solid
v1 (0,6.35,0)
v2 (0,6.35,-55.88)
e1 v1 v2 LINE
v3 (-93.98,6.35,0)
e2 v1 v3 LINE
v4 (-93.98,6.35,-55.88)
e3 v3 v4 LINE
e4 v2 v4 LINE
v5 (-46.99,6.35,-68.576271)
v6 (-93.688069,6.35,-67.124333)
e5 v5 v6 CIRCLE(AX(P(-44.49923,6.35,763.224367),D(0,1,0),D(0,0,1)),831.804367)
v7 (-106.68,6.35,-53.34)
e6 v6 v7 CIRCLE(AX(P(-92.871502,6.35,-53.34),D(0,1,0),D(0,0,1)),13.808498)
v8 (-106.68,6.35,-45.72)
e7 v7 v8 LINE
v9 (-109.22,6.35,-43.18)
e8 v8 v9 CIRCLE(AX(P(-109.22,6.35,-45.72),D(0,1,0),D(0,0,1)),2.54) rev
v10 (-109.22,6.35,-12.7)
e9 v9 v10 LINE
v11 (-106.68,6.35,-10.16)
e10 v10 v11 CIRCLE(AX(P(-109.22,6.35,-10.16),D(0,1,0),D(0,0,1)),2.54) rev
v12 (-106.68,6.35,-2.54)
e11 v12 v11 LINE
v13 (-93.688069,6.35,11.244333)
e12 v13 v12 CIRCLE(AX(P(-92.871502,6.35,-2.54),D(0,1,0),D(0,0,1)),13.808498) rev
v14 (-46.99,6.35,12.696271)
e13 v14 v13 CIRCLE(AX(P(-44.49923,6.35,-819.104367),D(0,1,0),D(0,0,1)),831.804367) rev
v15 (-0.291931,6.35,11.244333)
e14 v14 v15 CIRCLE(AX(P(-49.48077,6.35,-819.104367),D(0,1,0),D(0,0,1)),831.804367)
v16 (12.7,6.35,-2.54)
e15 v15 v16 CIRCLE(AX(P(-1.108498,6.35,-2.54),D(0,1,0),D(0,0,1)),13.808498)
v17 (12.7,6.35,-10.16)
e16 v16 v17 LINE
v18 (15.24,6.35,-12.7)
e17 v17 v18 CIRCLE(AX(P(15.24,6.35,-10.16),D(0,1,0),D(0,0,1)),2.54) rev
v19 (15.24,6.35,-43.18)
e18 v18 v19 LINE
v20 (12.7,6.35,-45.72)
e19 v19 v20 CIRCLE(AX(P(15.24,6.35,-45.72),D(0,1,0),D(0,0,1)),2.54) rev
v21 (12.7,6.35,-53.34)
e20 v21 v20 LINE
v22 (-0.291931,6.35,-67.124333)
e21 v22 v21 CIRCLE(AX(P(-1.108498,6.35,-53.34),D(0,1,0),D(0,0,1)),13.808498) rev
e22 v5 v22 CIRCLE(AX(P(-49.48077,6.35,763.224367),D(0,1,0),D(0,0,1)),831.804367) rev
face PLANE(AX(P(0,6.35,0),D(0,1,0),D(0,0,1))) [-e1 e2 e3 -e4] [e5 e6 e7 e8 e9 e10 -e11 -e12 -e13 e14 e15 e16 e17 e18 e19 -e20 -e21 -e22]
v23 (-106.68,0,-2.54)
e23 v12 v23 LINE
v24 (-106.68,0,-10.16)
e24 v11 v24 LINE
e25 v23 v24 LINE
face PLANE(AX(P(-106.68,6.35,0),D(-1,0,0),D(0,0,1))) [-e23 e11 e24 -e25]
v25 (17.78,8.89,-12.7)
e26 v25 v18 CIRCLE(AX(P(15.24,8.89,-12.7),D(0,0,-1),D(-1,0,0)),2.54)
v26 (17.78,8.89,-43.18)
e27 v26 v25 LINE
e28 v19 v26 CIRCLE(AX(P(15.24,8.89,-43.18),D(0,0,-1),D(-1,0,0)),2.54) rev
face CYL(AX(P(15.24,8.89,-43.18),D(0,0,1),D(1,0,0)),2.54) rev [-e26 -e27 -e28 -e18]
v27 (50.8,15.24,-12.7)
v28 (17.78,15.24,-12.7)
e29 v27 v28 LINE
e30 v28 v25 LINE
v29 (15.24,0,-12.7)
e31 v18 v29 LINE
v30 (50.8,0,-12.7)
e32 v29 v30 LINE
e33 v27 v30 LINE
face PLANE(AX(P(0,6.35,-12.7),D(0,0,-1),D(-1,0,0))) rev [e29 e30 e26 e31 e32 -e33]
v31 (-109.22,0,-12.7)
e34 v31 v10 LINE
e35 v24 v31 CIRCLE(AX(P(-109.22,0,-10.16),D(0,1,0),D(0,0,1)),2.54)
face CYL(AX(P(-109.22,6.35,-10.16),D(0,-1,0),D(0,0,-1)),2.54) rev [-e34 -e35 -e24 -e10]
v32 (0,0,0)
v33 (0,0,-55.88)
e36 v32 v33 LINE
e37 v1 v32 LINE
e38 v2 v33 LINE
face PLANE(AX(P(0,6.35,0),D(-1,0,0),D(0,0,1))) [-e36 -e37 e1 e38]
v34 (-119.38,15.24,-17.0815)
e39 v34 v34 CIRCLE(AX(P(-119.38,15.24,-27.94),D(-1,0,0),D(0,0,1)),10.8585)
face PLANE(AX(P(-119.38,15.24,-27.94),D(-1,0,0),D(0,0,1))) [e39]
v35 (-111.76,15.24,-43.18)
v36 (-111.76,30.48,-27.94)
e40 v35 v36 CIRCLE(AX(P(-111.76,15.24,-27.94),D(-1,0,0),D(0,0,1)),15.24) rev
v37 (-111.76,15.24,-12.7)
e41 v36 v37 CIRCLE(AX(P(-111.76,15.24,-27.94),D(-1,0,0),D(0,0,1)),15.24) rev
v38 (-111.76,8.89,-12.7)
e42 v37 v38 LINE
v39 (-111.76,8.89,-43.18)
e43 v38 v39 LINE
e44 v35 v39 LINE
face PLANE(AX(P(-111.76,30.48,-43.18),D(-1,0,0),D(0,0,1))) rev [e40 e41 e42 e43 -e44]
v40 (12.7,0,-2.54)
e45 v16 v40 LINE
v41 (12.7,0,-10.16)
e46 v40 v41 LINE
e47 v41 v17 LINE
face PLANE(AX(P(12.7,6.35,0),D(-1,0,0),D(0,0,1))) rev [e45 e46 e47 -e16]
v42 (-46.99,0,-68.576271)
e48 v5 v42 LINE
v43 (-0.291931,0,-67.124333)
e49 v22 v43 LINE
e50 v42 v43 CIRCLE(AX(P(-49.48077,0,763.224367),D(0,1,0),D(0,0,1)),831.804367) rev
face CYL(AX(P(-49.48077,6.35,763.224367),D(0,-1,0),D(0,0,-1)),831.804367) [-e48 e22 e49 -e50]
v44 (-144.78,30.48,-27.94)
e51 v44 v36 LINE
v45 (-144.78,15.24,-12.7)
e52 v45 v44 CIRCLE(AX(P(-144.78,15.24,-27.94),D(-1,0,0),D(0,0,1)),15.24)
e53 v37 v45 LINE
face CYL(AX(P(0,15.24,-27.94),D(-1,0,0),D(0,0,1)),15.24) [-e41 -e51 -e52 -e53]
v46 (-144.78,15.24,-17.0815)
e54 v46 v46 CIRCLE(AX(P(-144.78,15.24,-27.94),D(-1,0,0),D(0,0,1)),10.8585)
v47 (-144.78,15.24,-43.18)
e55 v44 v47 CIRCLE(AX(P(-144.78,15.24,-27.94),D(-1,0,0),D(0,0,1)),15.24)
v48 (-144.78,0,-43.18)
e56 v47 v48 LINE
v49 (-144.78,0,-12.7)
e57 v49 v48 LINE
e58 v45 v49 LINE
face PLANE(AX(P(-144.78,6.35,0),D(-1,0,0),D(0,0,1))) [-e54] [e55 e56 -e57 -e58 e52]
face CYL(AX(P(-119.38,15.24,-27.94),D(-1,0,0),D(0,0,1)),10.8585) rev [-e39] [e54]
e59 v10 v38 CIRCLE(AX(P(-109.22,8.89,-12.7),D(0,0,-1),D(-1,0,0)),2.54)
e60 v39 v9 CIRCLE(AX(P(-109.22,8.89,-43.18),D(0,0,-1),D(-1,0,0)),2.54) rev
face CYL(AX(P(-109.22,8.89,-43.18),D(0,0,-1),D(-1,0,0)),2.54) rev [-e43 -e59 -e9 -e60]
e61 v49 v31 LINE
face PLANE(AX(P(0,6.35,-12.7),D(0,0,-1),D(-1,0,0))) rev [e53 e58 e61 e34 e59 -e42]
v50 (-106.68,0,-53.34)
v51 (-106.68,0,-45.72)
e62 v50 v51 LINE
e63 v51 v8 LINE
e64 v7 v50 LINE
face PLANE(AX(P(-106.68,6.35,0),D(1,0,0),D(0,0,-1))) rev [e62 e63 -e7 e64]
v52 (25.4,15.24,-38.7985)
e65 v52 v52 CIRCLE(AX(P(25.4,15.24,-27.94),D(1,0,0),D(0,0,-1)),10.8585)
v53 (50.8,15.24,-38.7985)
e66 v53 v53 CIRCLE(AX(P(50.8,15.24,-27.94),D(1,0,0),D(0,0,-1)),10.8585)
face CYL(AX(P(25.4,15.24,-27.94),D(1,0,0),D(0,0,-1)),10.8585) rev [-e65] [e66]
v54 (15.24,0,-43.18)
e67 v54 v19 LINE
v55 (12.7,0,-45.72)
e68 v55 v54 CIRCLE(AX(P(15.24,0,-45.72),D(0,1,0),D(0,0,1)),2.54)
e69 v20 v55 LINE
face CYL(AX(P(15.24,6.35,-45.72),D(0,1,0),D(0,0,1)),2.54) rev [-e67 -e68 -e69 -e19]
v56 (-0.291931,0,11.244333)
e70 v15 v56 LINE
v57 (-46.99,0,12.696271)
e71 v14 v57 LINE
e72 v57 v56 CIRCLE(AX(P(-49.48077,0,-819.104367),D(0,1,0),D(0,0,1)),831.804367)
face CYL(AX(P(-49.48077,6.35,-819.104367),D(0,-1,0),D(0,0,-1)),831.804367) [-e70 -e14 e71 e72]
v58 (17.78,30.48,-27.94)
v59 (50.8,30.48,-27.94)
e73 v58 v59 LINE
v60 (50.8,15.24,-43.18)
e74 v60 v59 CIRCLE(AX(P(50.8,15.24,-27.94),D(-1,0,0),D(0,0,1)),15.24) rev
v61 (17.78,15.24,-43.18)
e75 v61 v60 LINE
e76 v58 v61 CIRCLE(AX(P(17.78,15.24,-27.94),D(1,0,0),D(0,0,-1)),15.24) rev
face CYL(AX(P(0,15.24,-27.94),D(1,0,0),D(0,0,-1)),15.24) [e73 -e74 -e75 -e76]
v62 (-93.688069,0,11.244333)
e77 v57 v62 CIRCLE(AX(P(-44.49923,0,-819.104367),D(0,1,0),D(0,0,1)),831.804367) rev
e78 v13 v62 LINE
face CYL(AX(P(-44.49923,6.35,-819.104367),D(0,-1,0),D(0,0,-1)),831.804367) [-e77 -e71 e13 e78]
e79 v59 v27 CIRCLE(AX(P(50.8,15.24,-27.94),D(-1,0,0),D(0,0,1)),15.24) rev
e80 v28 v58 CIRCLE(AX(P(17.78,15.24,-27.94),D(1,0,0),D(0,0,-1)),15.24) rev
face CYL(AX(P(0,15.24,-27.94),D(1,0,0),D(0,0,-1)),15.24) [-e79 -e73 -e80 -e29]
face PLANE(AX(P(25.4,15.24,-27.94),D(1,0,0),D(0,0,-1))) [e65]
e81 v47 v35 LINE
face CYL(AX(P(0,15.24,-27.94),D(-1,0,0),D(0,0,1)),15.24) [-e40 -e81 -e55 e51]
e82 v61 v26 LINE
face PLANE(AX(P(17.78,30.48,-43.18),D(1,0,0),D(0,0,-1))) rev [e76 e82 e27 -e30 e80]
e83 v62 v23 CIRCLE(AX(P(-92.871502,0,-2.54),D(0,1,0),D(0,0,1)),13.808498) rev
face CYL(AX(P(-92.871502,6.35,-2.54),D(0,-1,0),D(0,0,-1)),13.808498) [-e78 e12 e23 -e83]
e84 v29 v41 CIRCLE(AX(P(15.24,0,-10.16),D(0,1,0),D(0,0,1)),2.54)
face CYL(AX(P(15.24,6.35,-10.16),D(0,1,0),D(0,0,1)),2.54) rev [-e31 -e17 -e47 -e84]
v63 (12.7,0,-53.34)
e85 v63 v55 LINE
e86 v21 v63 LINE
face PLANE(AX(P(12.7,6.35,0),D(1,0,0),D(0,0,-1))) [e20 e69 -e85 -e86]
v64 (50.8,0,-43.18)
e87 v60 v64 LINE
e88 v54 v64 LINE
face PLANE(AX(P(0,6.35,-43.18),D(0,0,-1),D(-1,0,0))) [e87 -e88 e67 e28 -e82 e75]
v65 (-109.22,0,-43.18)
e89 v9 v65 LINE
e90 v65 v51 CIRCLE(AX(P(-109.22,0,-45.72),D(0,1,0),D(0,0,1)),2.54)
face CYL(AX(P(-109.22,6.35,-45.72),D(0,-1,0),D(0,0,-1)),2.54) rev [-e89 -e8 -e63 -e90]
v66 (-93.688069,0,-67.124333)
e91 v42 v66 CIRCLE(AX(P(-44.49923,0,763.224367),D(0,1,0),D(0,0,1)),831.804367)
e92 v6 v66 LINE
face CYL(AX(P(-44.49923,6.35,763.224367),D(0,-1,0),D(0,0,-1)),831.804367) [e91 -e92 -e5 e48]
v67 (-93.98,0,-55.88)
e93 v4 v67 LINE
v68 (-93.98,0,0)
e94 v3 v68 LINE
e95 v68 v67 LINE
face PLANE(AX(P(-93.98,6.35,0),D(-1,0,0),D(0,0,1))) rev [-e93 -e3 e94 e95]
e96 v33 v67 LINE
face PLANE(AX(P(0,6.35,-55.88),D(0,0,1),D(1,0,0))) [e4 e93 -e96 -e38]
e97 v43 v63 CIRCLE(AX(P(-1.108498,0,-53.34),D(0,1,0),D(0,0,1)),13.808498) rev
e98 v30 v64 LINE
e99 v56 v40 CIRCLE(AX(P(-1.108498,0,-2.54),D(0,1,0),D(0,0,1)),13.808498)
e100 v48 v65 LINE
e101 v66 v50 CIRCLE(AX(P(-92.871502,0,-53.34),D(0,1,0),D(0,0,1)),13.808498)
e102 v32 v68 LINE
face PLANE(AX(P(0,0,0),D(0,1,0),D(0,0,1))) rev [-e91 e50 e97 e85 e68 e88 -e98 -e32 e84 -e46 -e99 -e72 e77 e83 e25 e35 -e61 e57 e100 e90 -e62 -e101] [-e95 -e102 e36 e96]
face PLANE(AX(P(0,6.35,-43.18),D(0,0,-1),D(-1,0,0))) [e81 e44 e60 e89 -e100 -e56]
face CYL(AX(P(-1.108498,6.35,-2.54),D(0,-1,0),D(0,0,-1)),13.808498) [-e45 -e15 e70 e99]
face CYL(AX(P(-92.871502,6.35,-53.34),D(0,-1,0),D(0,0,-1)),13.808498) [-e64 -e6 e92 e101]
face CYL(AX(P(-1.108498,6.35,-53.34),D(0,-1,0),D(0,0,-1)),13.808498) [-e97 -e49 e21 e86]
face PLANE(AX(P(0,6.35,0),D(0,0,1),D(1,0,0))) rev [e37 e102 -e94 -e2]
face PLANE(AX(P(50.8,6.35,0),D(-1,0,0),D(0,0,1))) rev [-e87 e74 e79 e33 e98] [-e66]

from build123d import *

# Parameters (mm, degrees)
SKETCH2_W           = 93.98
SKETCH2_H           = 55.88
BOSS_EXTRUDE1_DEPTH = 6.35
SKETCH3_W           = 33.02
SKETCH3_H           = 30.48
BOSS_EXTRUDE2_DEPTH = 24.13
FILLET1_R           = 2.54
SKETCH4_R           = 10.8585
CUT_EXTRUDE1_DEPTH  = 25.4
CUT_EXTRUDE2_START  = -25.4
SKETCH5_R           = 10.8585
CUT_EXTRUDE2_DEPTH  = 25.4
FILLET2_R           = 2.54
FILLET3_R           = 15.24


with BuildPart() as part:
    # Sketch2 → Boss-Extrude1 (new body)
    with BuildSketch(Plane(origin=(0, 0, 0), x_dir=(1, 0, 0), z_dir=(0, 1, 0))):
        with BuildLine():
            ThreePointArc((-93.688069253, -11.244332686), (-70.349230661, -12.298232488), (-46.99, -12.696270789))
            ThreePointArc((-46.99, -12.696270789), (-23.630769339, -12.298232488), (-0.291930747, -11.244332686))
            ThreePointArc((-0.291930747, -11.244332686), (8.940138318, -6.930983214), (12.7, 2.54))
            Line((12.7, 2.54), (12.7, 12.7))
            Line((12.7, 12.7), (50.8, 12.7))
            Line((50.8, 12.7), (50.8, 43.18))
            Line((50.8, 43.18), (12.7, 43.18))
            Line((12.7, 43.18), (12.7, 53.34))
            ThreePointArc((12.7, 53.34), (8.940138318, 62.810983214), (-0.291930747, 67.124332686))
            ThreePointArc((-0.291930747, 67.124332686), (-23.630769339, 68.178232488), (-46.99, 68.576270789))
            ThreePointArc((-46.99, 68.576270789), (-70.349230661, 68.178232488), (-93.688069253, 67.124332686))
            ThreePointArc((-93.688069253, 67.124332686), (-102.920138318, 62.810983214), (-106.68, 53.34))
            Line((-106.68, 53.34), (-106.68, 43.18))
            Line((-106.68, 43.18), (-144.78, 43.18))
            Line((-144.78, 43.18), (-144.78, 12.7))
            Line((-144.78, 12.7), (-106.68, 12.7))
            Line((-106.68, 12.7), (-106.68, 2.54))
            ThreePointArc((-106.68, 2.54), (-102.920138318, -6.930983214), (-93.688069253, -11.244332686))
        make_face()
        with Locations((-46.99, 27.94)):
            Rectangle(SKETCH2_W, SKETCH2_H, mode=Mode.SUBTRACT)
    extrude(amount=BOSS_EXTRUDE1_DEPTH)

    # Sketch3 → Boss-Extrude2 (add)
    with BuildSketch(Plane(origin=(0, 6.35, 0), x_dir=(1, 0, 0), z_dir=(0, 1, 0))):
        with Locations((34.29, 27.94)):
            Rectangle(SKETCH3_W, SKETCH3_H)
        with Locations((-128.27, 27.94)):
            Rectangle(SKETCH3_W, SKETCH3_H)
    extrude(amount=BOSS_EXTRUDE2_DEPTH)

    # Fillet1
    fillet1_edges = [part.edges().sort_by_distance(p)[0] for p in [
        (17.78, 6.35, -27.94),
        (-111.76, 6.35, -27.94),
    ]]
    fillet(fillet1_edges, radius=FILLET1_R)

    # Sketch4 → Cut-Extrude1 (cut)
    with BuildSketch(Plane(origin=(50.8, 0, 0), x_dir=(0, 0, -1), z_dir=(1, 0, 0))):
        with Locations((27.94, 15.24)):
            Circle(SKETCH4_R)
    extrude(amount=-CUT_EXTRUDE1_DEPTH, mode=Mode.SUBTRACT)

    # Sketch5 → Cut-Extrude2 (cut)
    with BuildSketch(Plane.ZY.offset(144.78).offset(CUT_EXTRUDE2_START)):
        with Locations(Location((-27.94, 15.24, 0), (0, 0, 180))):
            Circle(SKETCH5_R)
    extrude(amount=CUT_EXTRUDE2_DEPTH, mode=Mode.SUBTRACT)

    # Fillet2
    fillet2_edges = [part.edges().sort_by_distance(p)[0] for p in [
        (12.7, 3.175, -43.18),
        (12.7, 3.175, -12.7),
        (-106.68, 3.175, -43.18),
        (-106.68, 3.175, -12.7),
    ]]
    fillet(fillet2_edges, radius=FILLET2_R)

    # Fillet3
    fillet3_edges = [part.edges().sort_by_distance(p)[0] for p in [
        (34.29, 30.48, -43.18),
        (34.29, 30.48, -12.7),
        (-128.27, 30.48, -43.18),
        (-128.27, 30.48, -12.7),
    ]]
    fillet(fillet3_edges, radius=FILLET3_R - 0.0001)  # a hair under: the kernel refuses the full size


solid = part.part
